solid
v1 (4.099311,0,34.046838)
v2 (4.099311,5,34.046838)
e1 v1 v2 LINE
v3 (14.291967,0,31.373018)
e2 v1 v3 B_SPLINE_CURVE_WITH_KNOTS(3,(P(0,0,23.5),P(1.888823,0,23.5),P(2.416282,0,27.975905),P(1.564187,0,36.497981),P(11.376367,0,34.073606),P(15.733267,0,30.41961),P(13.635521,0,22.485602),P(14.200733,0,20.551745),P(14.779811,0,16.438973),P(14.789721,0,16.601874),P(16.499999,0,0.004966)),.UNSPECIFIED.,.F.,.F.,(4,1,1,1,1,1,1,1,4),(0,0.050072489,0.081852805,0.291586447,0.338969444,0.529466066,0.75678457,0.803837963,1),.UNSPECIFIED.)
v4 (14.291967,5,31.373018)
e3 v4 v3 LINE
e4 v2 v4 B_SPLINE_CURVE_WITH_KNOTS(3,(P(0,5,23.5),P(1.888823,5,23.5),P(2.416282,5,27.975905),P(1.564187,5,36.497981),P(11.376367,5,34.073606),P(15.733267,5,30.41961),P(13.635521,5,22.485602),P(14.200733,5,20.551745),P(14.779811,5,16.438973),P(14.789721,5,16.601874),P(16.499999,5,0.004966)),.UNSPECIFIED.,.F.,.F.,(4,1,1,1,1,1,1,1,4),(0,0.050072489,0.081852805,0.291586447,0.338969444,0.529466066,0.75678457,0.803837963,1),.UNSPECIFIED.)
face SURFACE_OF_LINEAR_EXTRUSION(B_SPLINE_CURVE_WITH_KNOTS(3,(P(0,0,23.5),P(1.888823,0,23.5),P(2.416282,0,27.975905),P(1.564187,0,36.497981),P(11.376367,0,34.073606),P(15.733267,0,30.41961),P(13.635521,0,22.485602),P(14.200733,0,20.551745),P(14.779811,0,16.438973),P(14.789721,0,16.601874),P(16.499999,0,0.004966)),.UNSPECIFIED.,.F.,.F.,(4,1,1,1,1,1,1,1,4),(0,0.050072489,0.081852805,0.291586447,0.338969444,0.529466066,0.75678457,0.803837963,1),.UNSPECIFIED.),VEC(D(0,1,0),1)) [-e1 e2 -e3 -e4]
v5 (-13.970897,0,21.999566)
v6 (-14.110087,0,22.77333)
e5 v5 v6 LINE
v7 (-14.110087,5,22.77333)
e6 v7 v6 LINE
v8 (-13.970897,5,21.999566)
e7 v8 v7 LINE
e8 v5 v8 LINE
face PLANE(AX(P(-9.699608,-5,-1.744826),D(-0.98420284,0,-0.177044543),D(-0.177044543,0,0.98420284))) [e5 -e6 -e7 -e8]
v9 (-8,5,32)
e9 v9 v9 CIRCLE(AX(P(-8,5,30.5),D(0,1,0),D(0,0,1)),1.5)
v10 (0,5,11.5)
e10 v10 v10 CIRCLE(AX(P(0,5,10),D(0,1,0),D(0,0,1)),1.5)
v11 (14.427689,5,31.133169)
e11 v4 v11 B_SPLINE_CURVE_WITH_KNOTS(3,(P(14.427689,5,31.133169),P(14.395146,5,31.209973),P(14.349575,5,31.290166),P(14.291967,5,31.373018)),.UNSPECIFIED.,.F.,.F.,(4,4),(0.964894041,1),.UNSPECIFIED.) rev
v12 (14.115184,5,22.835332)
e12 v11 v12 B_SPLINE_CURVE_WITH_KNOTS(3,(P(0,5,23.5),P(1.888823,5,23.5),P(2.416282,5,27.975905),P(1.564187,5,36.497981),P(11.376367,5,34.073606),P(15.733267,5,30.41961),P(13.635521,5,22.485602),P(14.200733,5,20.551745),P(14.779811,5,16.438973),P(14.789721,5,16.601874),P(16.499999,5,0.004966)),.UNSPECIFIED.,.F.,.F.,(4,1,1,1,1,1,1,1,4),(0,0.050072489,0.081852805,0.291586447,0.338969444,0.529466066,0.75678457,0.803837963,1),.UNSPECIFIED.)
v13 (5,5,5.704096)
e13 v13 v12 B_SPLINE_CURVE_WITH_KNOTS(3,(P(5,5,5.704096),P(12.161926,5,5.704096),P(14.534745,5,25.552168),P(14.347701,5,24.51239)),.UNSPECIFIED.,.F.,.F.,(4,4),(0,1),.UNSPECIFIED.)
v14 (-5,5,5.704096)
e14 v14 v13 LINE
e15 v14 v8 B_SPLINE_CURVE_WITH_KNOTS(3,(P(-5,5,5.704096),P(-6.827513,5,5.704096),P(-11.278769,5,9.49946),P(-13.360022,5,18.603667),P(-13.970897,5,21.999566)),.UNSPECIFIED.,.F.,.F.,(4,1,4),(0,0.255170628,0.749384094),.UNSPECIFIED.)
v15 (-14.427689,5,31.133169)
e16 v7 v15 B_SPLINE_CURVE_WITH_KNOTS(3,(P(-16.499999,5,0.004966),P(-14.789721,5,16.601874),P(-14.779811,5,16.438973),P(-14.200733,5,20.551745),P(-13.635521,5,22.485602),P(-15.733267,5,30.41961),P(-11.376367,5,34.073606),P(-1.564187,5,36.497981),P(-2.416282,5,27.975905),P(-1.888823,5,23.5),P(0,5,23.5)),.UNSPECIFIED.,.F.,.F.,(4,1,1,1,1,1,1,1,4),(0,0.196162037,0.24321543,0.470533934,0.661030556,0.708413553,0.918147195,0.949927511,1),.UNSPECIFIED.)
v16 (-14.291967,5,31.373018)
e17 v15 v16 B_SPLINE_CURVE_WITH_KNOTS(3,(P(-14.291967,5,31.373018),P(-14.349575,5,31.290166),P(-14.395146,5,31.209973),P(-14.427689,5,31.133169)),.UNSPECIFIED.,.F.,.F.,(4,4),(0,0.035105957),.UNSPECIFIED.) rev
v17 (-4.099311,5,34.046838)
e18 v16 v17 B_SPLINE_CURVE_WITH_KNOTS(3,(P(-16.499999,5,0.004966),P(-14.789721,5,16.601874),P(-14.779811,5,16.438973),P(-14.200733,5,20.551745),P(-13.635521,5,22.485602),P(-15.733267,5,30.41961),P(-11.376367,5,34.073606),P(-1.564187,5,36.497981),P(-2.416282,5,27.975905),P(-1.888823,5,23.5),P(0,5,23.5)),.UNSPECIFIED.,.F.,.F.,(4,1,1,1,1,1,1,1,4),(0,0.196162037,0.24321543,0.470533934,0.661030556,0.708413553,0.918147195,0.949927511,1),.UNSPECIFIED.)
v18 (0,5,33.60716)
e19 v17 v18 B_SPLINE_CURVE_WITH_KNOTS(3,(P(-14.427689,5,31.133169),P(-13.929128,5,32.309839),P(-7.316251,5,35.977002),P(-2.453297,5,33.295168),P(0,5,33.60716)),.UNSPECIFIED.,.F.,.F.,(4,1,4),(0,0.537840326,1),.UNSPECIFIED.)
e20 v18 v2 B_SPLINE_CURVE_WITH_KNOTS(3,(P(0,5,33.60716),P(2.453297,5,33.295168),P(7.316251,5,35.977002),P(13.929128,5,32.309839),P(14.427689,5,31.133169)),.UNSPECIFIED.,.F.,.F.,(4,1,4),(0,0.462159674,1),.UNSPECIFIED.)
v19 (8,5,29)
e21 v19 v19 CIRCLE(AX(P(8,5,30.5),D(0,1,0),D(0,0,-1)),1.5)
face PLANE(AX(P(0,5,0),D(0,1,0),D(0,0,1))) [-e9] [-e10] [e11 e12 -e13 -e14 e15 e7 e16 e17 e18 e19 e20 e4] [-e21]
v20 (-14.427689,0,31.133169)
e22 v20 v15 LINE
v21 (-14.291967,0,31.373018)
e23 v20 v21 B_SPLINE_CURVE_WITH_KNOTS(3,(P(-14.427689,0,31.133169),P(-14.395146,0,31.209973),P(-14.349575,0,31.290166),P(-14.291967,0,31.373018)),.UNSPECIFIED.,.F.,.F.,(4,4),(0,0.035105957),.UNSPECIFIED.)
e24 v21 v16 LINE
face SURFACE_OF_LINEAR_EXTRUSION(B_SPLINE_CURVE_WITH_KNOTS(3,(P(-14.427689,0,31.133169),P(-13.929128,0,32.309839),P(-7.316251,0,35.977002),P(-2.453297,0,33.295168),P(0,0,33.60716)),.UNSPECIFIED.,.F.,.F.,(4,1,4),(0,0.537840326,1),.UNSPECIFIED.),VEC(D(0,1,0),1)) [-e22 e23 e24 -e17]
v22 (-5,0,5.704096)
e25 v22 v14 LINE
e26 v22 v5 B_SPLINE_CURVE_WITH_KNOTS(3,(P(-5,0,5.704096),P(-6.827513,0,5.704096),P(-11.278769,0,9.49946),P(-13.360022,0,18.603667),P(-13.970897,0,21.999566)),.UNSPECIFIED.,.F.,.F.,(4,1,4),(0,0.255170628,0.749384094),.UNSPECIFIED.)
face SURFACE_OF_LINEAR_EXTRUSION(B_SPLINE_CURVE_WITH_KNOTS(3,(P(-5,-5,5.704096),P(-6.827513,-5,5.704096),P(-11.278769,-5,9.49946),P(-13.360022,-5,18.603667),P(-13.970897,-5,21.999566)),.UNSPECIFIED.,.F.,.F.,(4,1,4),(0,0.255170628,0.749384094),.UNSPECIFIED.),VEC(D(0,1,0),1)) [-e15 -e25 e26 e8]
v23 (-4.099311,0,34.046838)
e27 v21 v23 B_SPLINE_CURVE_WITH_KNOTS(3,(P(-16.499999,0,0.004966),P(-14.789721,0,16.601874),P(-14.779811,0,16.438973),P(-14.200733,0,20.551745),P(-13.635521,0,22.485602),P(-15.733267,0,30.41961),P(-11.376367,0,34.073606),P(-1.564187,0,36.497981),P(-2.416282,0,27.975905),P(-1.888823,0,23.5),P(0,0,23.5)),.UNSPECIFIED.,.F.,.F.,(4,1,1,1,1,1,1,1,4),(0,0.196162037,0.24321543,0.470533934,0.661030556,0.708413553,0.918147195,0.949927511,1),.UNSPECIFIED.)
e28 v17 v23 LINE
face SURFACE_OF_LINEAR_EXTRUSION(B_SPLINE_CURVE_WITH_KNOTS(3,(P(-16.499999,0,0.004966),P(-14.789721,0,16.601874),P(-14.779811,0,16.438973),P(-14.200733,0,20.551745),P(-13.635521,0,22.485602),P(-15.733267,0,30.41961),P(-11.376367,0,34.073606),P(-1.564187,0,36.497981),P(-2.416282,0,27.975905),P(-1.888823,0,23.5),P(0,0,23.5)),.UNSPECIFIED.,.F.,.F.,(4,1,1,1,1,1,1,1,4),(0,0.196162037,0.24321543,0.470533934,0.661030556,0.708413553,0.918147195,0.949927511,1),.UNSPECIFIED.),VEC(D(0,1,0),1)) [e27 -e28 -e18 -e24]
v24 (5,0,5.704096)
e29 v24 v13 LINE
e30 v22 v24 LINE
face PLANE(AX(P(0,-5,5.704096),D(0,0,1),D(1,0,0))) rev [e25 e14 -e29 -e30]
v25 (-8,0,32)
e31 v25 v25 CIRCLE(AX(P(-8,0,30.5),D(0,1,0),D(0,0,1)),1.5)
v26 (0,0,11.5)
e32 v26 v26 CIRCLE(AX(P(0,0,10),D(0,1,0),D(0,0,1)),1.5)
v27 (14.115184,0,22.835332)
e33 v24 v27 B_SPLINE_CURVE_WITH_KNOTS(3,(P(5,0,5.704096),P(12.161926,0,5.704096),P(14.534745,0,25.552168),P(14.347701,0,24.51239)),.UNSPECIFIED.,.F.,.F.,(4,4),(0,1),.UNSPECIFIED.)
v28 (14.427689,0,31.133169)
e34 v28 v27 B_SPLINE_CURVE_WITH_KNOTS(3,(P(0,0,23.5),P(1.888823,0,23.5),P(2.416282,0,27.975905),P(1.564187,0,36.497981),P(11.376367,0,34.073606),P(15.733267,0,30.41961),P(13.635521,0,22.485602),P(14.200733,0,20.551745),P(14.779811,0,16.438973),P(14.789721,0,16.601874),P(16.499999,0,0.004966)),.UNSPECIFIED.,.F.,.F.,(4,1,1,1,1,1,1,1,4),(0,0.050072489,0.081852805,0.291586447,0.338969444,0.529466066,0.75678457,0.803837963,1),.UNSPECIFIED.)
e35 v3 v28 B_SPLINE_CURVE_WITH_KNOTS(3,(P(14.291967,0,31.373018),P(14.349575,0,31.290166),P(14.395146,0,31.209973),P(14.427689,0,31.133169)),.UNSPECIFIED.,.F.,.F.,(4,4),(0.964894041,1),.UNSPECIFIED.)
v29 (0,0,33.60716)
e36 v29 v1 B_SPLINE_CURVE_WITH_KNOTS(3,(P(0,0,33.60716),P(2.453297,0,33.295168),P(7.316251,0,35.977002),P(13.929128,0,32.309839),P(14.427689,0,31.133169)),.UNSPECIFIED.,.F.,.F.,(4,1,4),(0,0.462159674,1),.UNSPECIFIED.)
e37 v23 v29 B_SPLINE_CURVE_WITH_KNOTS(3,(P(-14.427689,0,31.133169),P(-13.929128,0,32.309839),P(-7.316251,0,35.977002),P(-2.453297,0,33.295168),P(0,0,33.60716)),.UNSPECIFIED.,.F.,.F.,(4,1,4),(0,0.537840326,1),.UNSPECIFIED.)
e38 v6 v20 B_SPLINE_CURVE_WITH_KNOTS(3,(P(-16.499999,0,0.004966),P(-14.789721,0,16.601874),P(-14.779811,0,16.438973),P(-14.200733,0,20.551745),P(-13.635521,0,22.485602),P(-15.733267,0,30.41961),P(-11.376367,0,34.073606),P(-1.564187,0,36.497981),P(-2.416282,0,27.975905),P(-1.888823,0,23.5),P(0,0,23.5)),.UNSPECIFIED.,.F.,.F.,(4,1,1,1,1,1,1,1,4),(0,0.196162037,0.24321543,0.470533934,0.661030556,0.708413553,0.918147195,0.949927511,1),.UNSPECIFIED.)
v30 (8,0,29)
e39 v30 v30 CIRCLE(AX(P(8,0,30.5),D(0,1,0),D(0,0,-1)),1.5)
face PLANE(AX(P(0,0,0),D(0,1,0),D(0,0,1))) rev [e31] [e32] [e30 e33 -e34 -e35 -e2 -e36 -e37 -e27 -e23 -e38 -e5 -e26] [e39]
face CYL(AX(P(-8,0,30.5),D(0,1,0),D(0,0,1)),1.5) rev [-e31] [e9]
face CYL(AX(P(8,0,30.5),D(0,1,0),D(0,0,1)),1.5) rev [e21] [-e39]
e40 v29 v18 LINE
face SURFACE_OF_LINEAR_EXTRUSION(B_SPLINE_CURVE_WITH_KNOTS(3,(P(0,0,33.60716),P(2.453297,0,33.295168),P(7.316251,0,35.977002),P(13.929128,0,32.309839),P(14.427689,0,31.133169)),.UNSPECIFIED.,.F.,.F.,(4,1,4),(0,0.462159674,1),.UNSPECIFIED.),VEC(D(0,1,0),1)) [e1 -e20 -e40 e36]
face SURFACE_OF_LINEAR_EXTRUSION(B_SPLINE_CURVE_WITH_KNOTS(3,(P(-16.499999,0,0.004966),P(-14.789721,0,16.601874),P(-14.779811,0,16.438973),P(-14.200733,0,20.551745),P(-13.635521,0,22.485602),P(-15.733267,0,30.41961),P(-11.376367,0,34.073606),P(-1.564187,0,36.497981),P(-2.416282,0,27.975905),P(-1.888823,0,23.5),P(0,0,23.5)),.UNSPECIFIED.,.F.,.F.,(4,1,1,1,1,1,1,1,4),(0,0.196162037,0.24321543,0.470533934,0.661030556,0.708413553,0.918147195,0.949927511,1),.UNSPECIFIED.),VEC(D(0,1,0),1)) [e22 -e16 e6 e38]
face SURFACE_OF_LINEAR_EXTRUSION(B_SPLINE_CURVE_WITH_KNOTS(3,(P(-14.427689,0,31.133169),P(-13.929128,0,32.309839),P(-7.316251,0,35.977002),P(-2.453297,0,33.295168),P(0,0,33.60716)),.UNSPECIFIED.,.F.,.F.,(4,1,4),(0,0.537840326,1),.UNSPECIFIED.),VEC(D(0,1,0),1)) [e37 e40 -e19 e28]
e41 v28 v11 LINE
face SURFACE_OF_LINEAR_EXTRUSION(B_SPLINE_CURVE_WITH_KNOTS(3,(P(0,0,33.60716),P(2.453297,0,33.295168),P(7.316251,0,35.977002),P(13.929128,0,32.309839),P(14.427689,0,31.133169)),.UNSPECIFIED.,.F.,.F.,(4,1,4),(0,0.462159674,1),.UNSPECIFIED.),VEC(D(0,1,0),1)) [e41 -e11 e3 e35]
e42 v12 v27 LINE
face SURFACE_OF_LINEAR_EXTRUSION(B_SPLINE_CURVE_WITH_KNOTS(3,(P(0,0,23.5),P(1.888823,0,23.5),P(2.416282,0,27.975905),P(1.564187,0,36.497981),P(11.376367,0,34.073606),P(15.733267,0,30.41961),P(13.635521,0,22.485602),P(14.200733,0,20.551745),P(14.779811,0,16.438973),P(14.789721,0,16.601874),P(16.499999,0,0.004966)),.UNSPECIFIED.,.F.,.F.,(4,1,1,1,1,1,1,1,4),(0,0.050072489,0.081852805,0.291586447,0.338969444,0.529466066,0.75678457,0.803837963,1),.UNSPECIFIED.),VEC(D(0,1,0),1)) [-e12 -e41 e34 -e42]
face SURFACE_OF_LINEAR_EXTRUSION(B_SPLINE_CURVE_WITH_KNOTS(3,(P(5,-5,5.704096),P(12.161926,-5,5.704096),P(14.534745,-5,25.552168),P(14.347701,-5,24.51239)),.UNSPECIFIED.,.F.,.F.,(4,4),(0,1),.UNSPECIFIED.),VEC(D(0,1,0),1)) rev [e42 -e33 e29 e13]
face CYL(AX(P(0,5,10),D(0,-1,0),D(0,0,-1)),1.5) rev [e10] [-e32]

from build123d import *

# Parameters (mm, degrees)
CROQUIS1_R                  = 16.5
CROQUIS1_R_2                = 3.75
CROQUIS1_R_3                = 1.5
SALIENTE_EXTRUIR1_DEPTH     = 5
CROQUIS2_R                  = 5.5
CORTAR_EXTRUIR1_DEPTH       = 2
CORTAR_EXTRUIR2_START       = -5
CROQUIS4_R                  = 3
CORTAR_EXTRUIR2_DEPTH       = 2.5
CROQUIS6_R                  = 1.5
SALIENTE_EXTRUIR3_DEPTH     = 5
SALIENTE_EXTRUIR4_START     = -5
SALIENTE_EXTRUIR4_DEPTH     = 5
CORTAR_EXTRUIR3_START       = -5
CORTAR_EXTRUIR3_OUTLINE_R   = 1.5
CORTAR_EXTRUIR3_OUTLINE_R_2 = 3.75
CORTAR_EXTRUIR3_DEPTH       = 5


# Read off the part's stored shape, not the designer's step: Saliente-Extruir4, Cortar-Extruir3
with BuildPart() as part:
    # Croquis1 → Saliente-Extruir1 (new body)
    with BuildSketch(Plane(origin=(0, 0, 0), x_dir=(1, 0, 0), z_dir=(0, 1, 0))):
        with Locations(Location((0, 0, 0), (0, 0, 270))):
            Circle(CROQUIS1_R)
        with Locations(Location((0, 0, 0), (0, 0, 270))):
            Circle(CROQUIS1_R_2, mode=Mode.SUBTRACT)
        with Locations(Location((10, 0, 0), (0, 0, 270))):
            Circle(CROQUIS1_R_3, mode=Mode.SUBTRACT)
        with Locations(Location((0, -10, 0), (0, 0, 270))):
            Circle(CROQUIS1_R_3, mode=Mode.SUBTRACT)
        with Locations(Location((-10, 0, 0), (0, 0, 270))):
            Circle(CROQUIS1_R_3, mode=Mode.SUBTRACT)
        with Locations(Location((0, 10, 0), (0, 0, 270))):
            Circle(CROQUIS1_R_3, mode=Mode.SUBTRACT)
    extrude(amount=SALIENTE_EXTRUIR1_DEPTH)

    # Croquis2 → Cortar-Extruir1 (cut)
    with BuildSketch(Plane(origin=(0, 5, 0), x_dir=(1, 0, 0), z_dir=(0, 1, 0))):
        with Locations(Location((0, 0, 0), (0, 0, 270))):
            Circle(CROQUIS2_R)
    extrude(amount=-CORTAR_EXTRUIR1_DEPTH, mode=Mode.SUBTRACT)

    # Croquis4 → Cortar-Extruir2 (cut)
    with BuildSketch(Plane(origin=(0, 5, 0), x_dir=(1, 0, 0), z_dir=(0, 1, 0)).offset(CORTAR_EXTRUIR2_START)):
        with Locations(Location((10, 0, 0), (0, 0, 270))):
            Circle(CROQUIS4_R)
        with Locations(Location((-10, 0, 0), (0, 0, 270))):
            Circle(CROQUIS4_R)
        with Locations(Location((0, 10, 0), (0, 0, 270))):
            Circle(CROQUIS4_R)
    extrude(amount=CORTAR_EXTRUIR2_DEPTH, mode=Mode.SUBTRACT)

    # Croquis6 → Saliente-Extruir3 (add)
    with BuildSketch(Plane(origin=(0, 5, 0), x_dir=(1, 0, 0), z_dir=(0, 1, 0))):
        with BuildLine():
            Line((-16.499999253, -0.004966275), (0, -15.162135144))
            Line((0, -15.162135144), (16.499999253, -0.004966275))
            add(Edge.make_bspline(
                [(16.499999253, -0.004966275), (14.789720677, -16.601874141), (14.779811161, -16.438973164), (14.200732618, -20.551745369), (13.635520661, -22.485602375), (15.733267293, -30.419610193), (11.37636727, -34.073606125), (1.56418736, -36.497980996), (2.416281914, -27.975905143), (1.888822796, -23.5), (0, -23.5)],
                knots=[0, 0, 0, 0, 0.196162037, 0.24321543, 0.470533934, 0.661030556, 0.708413553, 0.918147195, 0.949927511, 1, 1, 1, 1], degree=3))
            add(Edge.make_bspline(
                [(-16.499999253, -0.004966275), (-14.789720677, -16.601874141), (-14.779811161, -16.438973164), (-14.200732618, -20.551745369), (-13.635520661, -22.485602375), (-15.733267293, -30.419610193), (-11.37636727, -34.073606125), (-1.56418736, -36.497980996), (-2.416281914, -27.975905143), (-1.888822796, -23.5), (0, -23.5)],
                knots=[0, 0, 0, 0, 0.196162037, 0.24321543, 0.470533934, 0.661030556, 0.708413553, 0.918147195, 0.949927511, 1, 1, 1, 1], degree=3))
        make_face()
        with Locations(Location((-8, -30.5, 0), (0, 0, 270))):
            Circle(CROQUIS6_R, mode=Mode.SUBTRACT)
        with Locations(Location((8, -30.5, 0), (0, 0, 90))):
            Circle(CROQUIS6_R, mode=Mode.SUBTRACT)
    extrude(amount=-SALIENTE_EXTRUIR3_DEPTH)

    # Saliente-Extruir4 outline → Saliente-Extruir4 (add)
    with BuildSketch(Plane(origin=(0, 5, 0), x_dir=(1, 0, 0), z_dir=(0, 1, 0)).offset(SALIENTE_EXTRUIR4_START)):
        with BuildLine():
            add(Edge.make_bspline(
                [(14.291966708, -31.373017759), (14.340514678, -31.295086469), (14.385698727, -31.215084368), (14.427688557, -31.133168853)],
                knots=[0.343293779, 0.343293779, 0.343293779, 0.343293779, 0.350896071, 0.350896071, 0.350896071, 0.350896071], degree=3))
            add(Edge.make_bspline(
                [(14.291966708, -31.373017759), (14.349575443, -31.290166182), (14.395146457, -31.209972546), (14.427688557, -31.133168853)],
                knots=[0.96489404, 0.96489404, 0.96489404, 0.96489404, 1, 1, 1, 1], degree=3))
        make_face()
        with BuildLine():
            add(Edge.make_bspline(
                [(-14.427688557, -31.133168853), (-14.395146457, -31.209972546), (-14.349575443, -31.290166182), (-14.291966708, -31.373017759)],
                knots=[0, 0, 0, 0, 0.03510596, 0.03510596, 0.03510596, 0.03510596], degree=3))
            add(Edge.make_bspline(
                [(-14.427688557, -31.133168853), (-14.385698727, -31.215084368), (-14.340514678, -31.295086469), (-14.291966708, -31.373017759)],
                knots=[0.649103929, 0.649103929, 0.649103929, 0.649103929, 0.656706221, 0.656706221, 0.656706221, 0.656706221], degree=3))
        make_face()
        with BuildLine():
            add(Edge.make_bspline(
                [(0, -33.607159893), (1.397517326, -33.429434313), (2.728240909, -33.755145964), (4.099311118, -34.046838013)],
                knots=[0, 0, 0, 0, 0.263268598, 0.263268598, 0.263268598, 0.263268598], degree=3))
            add(Edge.make_bspline(
                [(0, -23.5), (1.888822796, -23.5), (2.416281914, -27.975905143), (1.994660589, -32.192677678), (3.074818283, -33.563655557), (4.099311118, -34.046838013)],
                knots=[0, 0, 0, 0, 0.050072489, 0.081852805, 0.144278664, 0.144278664, 0.144278664, 0.144278664], degree=3))
            add(Edge.make_bspline(
                [(-4.099311115, -34.046838012), (-3.074818281, -33.563655555), (-1.994660589, -32.192677676), (-2.416281914, -27.975905143), (-1.888822796, -23.5), (0, -23.5)],
                knots=[0.855721336, 0.855721336, 0.855721336, 0.855721336, 0.918147195, 0.949927511, 1, 1, 1, 1], degree=3))
            add(Edge.make_bspline(
                [(-4.099311115, -34.046838012), (-2.728240907, -33.755145963), (-1.397517325, -33.429434314), (0, -33.607159893)],
                knots=[0.736731402, 0.736731402, 0.736731402, 0.736731402, 1, 1, 1, 1], degree=3))
        make_face()
    extrude(amount=SALIENTE_EXTRUIR4_DEPTH)

    # Cortar-Extruir3 outline → Cortar-Extruir3 (cut)
    with BuildSketch(Plane(origin=(0, 5, 0), x_dir=(1, 0, 0), z_dir=(0, 1, 0)).offset(CORTAR_EXTRUIR3_START)):
        with BuildLine():
            add(Edge.make_bspline(
                [(-5, -5.704095984), (-6.82751306, -5.704095984), (-11.278769384, -9.499460435), (-13.360021763, -18.603666683), (-13.970897338, -21.999566183)],
                knots=[0, 0, 0, 0, 0.255170628, 0.749384094, 0.749384094, 0.749384094, 0.749384094], degree=3))
            Line((-5, -5.704095984), (5, -5.704095984))
            add(Edge.make_bspline(
                [(5, -5.704095984), (10.679811422, -5.704095984), (13.347569143, -18.187313933), (14.115183744, -22.835331636)],
                knots=[0, 0, 0, 0, 0.793056467, 0.793056467, 0.793056467, 0.793056467], degree=3))
            add(Edge.make_bspline(
                [(14.115183744, -22.835331636), (13.982038213, -21.263217458), (14.258823228, -20.139170168), (14.762278608, -16.563494089), (14.787566831, -16.590643141), (16.153585525, -3.36328332)],
                knots=[0.576667959, 0.576667959, 0.576667959, 0.576667959, 0.75678457, 0.803837963, 0.985753813, 0.985753813, 0.985753813, 0.985753813], degree=3))
            ThreePointArc((16.153585525, -3.36328332), (0, 16.5), (-16.153585525, -3.36328332))
            add(Edge.make_bspline(
                [(-16.153585525, -3.36328332), (-14.787566831, -16.590643141), (-14.762278608, -16.563494089), (-14.261753936, -20.118355485), (-13.987841454, -21.239556576), (-14.110086789, -22.773329956)],
                knots=[0.014246187, 0.014246187, 0.014246187, 0.014246187, 0.196162037, 0.24321543, 0.420950675, 0.420950675, 0.420950675, 0.420950675], degree=3))
            Line((-14.110086789, -22.773329956), (-13.970897338, -21.999566183))
        make_face()
        with Locations((-10, 0)):
            Circle(CORTAR_EXTRUIR3_OUTLINE_R, mode=Mode.SUBTRACT)
        Circle(CORTAR_EXTRUIR3_OUTLINE_R_2, mode=Mode.SUBTRACT)
        with Locations((10, 0)):
            Circle(CORTAR_EXTRUIR3_OUTLINE_R, mode=Mode.SUBTRACT)
        with Locations((0, 10)):
            Circle(CORTAR_EXTRUIR3_OUTLINE_R, mode=Mode.SUBTRACT)
    extrude(amount=CORTAR_EXTRUIR3_DEPTH, mode=Mode.SUBTRACT)


solid = part.part
